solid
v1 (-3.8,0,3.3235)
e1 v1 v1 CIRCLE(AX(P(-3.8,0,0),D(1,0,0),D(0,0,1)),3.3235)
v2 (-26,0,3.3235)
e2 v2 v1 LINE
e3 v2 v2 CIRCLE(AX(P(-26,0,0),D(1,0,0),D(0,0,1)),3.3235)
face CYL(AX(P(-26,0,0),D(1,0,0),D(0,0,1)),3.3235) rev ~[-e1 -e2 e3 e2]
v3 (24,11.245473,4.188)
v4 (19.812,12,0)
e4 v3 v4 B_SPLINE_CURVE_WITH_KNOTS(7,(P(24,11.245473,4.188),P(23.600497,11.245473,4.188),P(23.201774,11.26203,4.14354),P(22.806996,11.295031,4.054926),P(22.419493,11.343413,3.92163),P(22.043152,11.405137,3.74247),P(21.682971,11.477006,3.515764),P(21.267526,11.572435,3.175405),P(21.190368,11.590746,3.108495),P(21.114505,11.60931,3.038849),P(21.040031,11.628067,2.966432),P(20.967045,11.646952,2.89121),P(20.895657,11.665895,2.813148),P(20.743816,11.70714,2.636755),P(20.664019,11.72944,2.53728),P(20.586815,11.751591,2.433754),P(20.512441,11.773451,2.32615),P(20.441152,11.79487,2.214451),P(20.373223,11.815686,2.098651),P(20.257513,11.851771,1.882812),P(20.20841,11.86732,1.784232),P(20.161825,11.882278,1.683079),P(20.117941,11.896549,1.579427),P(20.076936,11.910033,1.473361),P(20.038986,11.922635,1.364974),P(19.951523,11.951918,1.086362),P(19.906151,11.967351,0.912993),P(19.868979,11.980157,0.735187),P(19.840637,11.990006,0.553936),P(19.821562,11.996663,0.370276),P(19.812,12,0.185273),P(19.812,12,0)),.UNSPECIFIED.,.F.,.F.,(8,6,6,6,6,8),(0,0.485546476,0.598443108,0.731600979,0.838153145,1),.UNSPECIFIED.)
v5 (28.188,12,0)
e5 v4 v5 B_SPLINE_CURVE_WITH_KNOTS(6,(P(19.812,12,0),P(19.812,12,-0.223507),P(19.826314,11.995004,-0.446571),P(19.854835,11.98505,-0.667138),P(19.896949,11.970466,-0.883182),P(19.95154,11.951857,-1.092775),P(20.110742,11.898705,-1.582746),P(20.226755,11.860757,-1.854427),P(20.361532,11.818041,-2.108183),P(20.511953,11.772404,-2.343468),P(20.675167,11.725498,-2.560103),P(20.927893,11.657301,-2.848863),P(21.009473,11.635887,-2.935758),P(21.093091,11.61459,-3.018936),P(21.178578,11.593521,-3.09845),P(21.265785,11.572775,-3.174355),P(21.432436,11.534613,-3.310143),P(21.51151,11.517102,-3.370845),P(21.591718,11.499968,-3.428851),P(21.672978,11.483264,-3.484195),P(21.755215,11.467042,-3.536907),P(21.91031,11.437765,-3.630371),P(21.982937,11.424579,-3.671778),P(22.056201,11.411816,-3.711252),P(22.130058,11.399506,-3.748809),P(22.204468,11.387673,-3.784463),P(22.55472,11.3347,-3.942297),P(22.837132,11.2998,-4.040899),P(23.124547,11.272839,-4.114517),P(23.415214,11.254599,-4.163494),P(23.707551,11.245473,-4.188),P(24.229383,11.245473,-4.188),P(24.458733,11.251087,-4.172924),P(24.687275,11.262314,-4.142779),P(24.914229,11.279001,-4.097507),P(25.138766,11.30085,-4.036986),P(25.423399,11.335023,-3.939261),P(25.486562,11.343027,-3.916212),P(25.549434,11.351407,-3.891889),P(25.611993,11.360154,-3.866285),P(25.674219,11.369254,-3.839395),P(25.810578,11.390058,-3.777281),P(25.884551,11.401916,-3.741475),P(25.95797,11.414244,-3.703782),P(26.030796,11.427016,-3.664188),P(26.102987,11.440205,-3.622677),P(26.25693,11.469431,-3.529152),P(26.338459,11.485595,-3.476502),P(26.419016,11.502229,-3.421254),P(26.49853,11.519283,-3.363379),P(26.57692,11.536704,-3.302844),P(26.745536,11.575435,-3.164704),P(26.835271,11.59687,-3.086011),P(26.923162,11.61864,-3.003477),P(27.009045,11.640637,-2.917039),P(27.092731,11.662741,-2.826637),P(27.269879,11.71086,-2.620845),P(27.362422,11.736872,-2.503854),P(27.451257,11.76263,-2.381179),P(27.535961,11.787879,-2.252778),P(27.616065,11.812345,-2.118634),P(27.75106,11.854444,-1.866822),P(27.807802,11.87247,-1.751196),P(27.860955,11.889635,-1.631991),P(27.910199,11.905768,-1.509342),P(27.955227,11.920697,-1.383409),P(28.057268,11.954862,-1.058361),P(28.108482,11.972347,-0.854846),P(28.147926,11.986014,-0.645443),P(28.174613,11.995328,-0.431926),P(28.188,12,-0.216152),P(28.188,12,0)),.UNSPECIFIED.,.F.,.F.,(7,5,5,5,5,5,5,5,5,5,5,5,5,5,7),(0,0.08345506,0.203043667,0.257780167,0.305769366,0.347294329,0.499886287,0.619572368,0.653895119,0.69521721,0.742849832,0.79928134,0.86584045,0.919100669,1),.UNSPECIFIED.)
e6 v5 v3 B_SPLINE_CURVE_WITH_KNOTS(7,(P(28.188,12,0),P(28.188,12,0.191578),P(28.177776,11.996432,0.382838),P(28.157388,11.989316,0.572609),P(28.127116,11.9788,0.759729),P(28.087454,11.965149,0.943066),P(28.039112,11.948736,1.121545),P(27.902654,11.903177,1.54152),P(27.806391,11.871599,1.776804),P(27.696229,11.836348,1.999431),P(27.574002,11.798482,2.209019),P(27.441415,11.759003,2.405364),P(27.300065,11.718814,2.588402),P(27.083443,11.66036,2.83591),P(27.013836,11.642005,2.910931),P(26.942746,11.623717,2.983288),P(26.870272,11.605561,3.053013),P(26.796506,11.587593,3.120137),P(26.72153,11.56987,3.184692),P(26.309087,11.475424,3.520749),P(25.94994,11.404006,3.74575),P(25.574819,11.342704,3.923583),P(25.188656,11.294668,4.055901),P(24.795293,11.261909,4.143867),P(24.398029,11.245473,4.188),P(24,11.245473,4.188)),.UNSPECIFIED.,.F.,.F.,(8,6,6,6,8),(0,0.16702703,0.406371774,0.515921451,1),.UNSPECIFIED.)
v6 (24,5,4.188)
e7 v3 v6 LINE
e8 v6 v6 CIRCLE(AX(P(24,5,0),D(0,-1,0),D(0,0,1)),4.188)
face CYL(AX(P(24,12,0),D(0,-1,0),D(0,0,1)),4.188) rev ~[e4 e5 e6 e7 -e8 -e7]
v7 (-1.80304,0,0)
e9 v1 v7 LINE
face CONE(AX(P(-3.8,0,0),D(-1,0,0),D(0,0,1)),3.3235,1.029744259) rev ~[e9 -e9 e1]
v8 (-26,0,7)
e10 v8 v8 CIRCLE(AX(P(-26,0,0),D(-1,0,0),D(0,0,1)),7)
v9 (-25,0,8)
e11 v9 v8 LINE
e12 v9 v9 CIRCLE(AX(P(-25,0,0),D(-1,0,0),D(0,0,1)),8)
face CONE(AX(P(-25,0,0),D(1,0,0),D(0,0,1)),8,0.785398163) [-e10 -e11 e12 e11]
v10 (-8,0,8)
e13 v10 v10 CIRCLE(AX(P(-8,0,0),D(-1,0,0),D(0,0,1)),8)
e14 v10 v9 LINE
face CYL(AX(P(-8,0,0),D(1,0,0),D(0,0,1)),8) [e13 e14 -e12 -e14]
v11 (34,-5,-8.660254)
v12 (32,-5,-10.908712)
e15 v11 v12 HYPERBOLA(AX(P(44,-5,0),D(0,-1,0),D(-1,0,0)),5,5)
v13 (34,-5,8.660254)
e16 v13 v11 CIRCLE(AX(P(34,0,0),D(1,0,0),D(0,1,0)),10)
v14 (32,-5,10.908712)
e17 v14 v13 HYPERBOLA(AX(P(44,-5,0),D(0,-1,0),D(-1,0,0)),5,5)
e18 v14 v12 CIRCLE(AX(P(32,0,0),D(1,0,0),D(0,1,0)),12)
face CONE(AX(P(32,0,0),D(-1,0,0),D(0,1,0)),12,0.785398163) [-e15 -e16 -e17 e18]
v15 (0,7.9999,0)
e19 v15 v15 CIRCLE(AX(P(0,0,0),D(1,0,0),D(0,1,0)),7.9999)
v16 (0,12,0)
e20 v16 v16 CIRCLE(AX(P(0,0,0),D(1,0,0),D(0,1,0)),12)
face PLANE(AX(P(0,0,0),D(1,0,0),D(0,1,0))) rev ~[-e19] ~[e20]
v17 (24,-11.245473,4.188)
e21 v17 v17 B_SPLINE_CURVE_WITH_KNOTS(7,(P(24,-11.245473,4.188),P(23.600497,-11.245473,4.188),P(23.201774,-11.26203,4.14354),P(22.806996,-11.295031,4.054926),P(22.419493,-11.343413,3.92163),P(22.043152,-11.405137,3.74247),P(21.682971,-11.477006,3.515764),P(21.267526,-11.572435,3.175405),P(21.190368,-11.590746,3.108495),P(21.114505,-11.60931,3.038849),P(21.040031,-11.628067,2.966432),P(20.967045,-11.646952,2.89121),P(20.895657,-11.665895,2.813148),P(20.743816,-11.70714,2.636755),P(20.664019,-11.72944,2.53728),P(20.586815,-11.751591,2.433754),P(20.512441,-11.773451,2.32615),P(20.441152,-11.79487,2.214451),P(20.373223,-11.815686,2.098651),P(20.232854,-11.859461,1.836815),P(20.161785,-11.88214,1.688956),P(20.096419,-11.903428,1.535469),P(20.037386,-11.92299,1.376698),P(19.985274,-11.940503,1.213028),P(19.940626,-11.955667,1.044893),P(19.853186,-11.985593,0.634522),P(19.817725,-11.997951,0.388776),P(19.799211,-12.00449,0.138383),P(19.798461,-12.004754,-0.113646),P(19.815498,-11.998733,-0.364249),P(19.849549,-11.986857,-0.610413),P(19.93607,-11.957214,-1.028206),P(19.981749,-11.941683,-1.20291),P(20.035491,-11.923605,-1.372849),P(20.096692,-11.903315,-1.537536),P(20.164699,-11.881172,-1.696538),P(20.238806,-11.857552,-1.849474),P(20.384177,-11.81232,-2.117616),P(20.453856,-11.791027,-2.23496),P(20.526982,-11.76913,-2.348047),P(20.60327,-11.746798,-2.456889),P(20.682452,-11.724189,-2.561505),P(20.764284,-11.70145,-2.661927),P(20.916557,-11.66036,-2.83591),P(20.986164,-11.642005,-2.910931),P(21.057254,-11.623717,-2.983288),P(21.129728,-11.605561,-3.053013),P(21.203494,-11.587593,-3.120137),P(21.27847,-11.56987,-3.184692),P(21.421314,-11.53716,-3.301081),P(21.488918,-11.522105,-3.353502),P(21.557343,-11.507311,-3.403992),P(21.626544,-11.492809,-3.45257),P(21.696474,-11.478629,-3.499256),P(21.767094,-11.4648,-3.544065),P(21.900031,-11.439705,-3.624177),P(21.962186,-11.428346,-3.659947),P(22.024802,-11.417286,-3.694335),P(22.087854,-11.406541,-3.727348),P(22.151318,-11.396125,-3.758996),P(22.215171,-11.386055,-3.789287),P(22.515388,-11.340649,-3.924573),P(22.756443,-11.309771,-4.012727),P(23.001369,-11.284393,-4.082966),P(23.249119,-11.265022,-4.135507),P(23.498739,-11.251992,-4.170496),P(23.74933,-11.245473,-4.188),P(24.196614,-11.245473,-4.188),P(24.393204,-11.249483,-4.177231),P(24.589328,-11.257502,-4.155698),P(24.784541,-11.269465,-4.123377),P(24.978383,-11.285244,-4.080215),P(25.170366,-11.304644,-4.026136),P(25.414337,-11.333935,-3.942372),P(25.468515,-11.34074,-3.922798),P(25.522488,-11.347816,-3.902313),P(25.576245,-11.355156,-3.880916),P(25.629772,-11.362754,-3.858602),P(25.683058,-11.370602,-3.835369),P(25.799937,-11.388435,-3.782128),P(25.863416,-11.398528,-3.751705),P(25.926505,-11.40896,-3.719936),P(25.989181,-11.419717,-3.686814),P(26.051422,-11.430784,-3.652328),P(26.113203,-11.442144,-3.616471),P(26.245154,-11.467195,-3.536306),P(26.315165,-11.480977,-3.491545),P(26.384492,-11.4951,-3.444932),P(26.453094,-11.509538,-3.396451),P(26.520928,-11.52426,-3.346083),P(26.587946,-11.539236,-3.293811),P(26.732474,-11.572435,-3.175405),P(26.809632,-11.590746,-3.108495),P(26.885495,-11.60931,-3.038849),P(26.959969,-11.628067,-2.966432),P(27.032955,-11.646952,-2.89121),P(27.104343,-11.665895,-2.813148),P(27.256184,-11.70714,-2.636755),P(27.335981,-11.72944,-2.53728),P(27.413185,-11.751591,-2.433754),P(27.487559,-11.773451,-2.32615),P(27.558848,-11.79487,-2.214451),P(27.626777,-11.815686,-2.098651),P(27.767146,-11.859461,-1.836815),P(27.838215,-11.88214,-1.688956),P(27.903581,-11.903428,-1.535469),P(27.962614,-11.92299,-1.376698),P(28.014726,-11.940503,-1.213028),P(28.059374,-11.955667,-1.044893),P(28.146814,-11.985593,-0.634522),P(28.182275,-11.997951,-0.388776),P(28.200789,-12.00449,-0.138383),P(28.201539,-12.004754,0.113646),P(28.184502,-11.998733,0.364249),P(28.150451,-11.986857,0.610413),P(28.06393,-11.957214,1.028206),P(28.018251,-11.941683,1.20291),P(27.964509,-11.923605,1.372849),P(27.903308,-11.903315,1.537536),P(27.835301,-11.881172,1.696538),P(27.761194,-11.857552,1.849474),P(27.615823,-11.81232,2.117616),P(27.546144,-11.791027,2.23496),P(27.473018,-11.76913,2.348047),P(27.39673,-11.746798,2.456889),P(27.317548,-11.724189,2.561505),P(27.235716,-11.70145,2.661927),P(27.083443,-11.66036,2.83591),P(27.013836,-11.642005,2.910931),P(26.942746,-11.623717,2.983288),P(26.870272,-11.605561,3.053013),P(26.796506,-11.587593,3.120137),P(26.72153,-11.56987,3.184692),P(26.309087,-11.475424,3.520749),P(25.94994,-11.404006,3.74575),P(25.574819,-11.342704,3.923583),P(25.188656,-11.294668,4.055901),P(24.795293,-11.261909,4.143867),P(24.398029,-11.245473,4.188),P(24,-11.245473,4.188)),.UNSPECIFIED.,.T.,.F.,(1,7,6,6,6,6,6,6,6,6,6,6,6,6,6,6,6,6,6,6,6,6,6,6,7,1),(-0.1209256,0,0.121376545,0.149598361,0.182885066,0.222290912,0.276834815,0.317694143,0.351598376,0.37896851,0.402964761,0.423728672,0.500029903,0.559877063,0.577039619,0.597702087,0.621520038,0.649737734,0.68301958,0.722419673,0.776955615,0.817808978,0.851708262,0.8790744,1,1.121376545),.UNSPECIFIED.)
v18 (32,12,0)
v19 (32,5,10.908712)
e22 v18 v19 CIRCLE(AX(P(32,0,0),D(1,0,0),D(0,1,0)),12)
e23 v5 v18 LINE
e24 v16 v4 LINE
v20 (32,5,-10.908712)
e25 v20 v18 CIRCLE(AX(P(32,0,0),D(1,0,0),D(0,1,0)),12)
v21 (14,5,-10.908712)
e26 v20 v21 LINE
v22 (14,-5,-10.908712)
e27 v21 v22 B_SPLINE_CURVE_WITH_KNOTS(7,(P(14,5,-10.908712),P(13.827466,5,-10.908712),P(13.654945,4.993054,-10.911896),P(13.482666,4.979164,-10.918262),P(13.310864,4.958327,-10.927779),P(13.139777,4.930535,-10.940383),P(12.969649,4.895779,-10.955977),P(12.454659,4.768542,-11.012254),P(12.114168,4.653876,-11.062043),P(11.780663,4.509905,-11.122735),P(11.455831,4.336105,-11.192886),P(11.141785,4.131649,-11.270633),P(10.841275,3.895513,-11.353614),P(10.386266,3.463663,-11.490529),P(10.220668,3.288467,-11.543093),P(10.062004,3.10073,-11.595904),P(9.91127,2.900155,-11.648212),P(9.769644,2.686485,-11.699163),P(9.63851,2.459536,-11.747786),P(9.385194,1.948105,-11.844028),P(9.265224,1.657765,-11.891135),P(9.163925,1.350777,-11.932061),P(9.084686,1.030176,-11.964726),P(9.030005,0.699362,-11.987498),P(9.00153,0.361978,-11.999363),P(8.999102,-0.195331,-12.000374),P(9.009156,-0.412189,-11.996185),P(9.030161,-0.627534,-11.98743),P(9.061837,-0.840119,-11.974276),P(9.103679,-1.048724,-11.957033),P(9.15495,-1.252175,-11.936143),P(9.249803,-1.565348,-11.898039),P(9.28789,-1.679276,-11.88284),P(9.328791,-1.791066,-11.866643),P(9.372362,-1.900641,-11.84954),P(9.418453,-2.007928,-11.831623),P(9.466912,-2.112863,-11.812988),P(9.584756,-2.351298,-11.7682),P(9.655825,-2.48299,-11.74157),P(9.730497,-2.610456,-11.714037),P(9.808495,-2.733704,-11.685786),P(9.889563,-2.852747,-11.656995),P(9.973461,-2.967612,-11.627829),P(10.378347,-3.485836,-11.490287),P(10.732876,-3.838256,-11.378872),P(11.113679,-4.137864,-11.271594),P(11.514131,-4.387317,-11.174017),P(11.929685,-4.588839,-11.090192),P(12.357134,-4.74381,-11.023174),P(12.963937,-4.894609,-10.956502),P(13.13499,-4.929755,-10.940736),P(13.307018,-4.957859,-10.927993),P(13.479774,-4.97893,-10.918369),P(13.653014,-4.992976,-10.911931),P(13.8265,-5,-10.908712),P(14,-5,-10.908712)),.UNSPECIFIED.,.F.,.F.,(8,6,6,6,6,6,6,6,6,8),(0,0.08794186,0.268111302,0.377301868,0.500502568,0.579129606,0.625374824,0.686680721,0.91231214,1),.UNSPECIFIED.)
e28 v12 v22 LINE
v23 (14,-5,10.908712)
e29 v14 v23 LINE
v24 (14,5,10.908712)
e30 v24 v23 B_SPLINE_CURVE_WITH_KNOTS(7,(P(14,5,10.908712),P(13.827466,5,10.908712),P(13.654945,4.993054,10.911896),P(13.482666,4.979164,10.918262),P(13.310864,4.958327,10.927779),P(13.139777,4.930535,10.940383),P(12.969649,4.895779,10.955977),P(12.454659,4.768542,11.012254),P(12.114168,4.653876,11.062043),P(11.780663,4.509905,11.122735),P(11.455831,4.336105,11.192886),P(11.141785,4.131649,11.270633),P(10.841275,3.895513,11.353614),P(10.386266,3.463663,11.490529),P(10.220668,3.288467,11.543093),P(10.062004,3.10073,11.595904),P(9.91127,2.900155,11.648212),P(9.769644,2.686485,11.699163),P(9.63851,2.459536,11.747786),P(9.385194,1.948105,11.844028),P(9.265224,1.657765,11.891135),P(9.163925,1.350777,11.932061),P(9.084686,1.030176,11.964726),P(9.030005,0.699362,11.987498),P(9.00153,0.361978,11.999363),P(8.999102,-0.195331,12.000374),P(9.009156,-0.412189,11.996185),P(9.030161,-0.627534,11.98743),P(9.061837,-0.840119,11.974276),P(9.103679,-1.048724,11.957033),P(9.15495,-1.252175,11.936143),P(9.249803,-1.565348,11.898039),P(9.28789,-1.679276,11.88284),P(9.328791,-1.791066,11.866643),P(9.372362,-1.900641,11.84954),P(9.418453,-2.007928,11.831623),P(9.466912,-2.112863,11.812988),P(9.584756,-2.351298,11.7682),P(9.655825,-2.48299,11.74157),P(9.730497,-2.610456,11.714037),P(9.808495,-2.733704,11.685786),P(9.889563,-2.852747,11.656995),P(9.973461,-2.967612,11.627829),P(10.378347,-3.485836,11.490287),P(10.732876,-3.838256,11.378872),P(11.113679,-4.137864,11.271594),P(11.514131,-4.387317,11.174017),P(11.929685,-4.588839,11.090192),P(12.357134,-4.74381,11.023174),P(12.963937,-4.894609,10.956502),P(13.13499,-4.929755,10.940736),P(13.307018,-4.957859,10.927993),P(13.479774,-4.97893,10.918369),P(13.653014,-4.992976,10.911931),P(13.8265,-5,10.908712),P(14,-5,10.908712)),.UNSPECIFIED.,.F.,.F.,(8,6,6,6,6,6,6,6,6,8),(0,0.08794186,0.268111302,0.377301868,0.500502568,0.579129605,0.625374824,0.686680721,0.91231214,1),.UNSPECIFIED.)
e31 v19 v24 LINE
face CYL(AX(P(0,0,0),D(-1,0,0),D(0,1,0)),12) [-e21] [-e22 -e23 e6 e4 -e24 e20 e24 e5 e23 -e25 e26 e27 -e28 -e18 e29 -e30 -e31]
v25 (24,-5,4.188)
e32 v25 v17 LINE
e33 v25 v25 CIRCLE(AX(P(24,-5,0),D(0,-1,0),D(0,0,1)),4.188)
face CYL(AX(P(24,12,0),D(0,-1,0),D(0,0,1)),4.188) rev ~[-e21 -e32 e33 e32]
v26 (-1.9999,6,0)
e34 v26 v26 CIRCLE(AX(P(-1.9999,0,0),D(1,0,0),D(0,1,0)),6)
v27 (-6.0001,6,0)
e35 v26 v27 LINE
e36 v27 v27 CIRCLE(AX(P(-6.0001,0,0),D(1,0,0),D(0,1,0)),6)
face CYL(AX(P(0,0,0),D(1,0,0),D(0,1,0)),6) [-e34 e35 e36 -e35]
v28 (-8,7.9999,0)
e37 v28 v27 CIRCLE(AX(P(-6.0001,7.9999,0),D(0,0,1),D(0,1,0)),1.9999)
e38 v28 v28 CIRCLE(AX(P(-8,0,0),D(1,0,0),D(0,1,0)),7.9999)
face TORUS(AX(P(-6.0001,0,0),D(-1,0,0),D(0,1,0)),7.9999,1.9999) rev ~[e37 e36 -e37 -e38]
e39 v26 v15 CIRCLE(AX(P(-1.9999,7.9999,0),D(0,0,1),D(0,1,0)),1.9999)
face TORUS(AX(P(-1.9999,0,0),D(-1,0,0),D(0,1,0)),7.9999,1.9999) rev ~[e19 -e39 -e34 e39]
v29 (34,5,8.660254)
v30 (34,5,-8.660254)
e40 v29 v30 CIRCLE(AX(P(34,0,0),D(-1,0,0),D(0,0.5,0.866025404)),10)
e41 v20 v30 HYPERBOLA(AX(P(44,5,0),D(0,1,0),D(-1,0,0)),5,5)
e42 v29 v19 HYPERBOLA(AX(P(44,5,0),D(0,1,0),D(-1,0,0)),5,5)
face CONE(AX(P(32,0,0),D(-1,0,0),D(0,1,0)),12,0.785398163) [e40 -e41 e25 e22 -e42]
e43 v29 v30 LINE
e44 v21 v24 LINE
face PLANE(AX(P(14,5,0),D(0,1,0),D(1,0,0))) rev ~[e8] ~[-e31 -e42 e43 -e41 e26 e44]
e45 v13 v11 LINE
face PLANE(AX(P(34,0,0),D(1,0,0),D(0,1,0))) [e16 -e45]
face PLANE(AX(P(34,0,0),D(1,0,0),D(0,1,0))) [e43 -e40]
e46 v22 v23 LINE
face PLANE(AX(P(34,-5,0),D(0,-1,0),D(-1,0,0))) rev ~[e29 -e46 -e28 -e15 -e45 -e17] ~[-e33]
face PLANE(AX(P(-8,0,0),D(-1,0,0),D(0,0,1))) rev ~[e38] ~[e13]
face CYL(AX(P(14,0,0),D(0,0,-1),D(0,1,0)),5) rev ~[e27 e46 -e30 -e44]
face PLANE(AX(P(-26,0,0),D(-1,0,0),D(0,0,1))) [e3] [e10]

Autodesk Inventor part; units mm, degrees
ref_plane "YZ Plane" through (0, 0, 0) normal (1, 0, 0) x (0, 1, 0)
ref_plane "XY Plane" through (0, 0, 0) normal (0, 0, 1) x (1, 0, 0)
sketch "Sketch1" plane through (0, 0, 0) normal (1, 0, 0) x (0, 1, 0)
  circle A0 centre (0, 0) radius 12
  dimension "d0" = 24
extrude "Extrusion1" add sketch "Sketch1" along normal blind 34
chamfer "Chamfer1" distance 2 angle 45 1 edges at (34, -12, 0)
sketch "Sketch2" plane through (0, 0, 0) normal (0, 0, 1) x (1, 0, 0)
  line L0 (0, -12) -> (0, 12) construction
  line L1 (32, -12) -> (32, 12) construction
  line L2 (0, 0) -> (32, 0) construction
  line L3 (14, 5) -> (34, 5)
  line L4 (34, -5) -> (14, -5)
  line L5 (34, 10) -> (34, -10) projected
  arc A0 (14, 5) -> (14, -5) centre (14, 0) ccw
  dimension "d8" = 10
  dimension "d9" = 5
extrude "Extrusion2" cut sketch "Sketch2" along normal through all both and the other way through all
sketch "Sketch5" plane through (0, 0, 0) normal (1, 0, 0) x (0, 1, 0)
  circle A0 centre (0, 0) radius 12 construction
  circle A1 centre (0, 0) radius 6
  dimension "d27" = 12
extrude "Extrusion3" add sketch "Sketch5" against normal blind 8
sketch "Sketch6" plane through (-8, 0, 0) normal (-1, 0, 0) x (0, 0, 1)
  circle A0 centre (0, 0) radius 6 projected
  circle A1 centre (0, 0) radius 8
  dimension "d30" = 16
extrude "Extrusion4" add sketch "Sketch6" along normal blind 18 contours A0 | A1
fillet "Fillet1" radius 2 2 edges at (0, -6, 0) (-8, -6, 0)
chamfer "Chamfer2" distance 1 angle 45 1 edges at (-26, 0, -8)
sketch "Sketch7" plane through (-26, 0, 0) normal (-1, 0, 0) x (0, 0, 1)
  circle A0 centre (0, 0) radius 8 projected
hole "Hole3" at (-26, 0, 0) direction (1, 0, 0) diameter 6.647 depth 22.2 tip angle 118 thread size "M8x1.25" class "6H" standard "ISO Metric profile"
ref_plane "Work Plane1" through (0, 12, 0) normal (0, 1, 0) x (-1, 0, 0)
sketch "Sketch9" plane through (0, 12, 0) normal (0, 1, 0) x (-1, 0, 0)
  line L0 (0, 12) -> (0, -12) construction
  line L1 (-32, 10.9087) -> (-14, 10.9087) construction
  line L2 (-14, 10.9087) -> (-32, 10.9087) construction
  line L3 (-32, -10.9087) -> (-32, 10.9087) construction
  line L4 (-32, -10.9087) -> (-14, -10.9087) construction
  line L5 (-14, -10.9087) -> (-32, -10.9087) construction
  line L6 (-32, 10.9087) -> (-32, -10.9087) construction
  line L7 (-34, -8.6603) -> (-34, 8.6603) construction
  point P0 (0, 0)
  point P1 (-24, 0)
  point P2 (-34, 0)
  dimension "d52" = 10
hole "Hole5" at (24, 12, 0) direction (0, -1, 0) diameter 8.376 depth 27.3 tip angle 118 thread size "M10x1.5" class "6H" standard "ISO Metric profile"
properties part number "Part11.End Fork" material "Steel, Carbon"
